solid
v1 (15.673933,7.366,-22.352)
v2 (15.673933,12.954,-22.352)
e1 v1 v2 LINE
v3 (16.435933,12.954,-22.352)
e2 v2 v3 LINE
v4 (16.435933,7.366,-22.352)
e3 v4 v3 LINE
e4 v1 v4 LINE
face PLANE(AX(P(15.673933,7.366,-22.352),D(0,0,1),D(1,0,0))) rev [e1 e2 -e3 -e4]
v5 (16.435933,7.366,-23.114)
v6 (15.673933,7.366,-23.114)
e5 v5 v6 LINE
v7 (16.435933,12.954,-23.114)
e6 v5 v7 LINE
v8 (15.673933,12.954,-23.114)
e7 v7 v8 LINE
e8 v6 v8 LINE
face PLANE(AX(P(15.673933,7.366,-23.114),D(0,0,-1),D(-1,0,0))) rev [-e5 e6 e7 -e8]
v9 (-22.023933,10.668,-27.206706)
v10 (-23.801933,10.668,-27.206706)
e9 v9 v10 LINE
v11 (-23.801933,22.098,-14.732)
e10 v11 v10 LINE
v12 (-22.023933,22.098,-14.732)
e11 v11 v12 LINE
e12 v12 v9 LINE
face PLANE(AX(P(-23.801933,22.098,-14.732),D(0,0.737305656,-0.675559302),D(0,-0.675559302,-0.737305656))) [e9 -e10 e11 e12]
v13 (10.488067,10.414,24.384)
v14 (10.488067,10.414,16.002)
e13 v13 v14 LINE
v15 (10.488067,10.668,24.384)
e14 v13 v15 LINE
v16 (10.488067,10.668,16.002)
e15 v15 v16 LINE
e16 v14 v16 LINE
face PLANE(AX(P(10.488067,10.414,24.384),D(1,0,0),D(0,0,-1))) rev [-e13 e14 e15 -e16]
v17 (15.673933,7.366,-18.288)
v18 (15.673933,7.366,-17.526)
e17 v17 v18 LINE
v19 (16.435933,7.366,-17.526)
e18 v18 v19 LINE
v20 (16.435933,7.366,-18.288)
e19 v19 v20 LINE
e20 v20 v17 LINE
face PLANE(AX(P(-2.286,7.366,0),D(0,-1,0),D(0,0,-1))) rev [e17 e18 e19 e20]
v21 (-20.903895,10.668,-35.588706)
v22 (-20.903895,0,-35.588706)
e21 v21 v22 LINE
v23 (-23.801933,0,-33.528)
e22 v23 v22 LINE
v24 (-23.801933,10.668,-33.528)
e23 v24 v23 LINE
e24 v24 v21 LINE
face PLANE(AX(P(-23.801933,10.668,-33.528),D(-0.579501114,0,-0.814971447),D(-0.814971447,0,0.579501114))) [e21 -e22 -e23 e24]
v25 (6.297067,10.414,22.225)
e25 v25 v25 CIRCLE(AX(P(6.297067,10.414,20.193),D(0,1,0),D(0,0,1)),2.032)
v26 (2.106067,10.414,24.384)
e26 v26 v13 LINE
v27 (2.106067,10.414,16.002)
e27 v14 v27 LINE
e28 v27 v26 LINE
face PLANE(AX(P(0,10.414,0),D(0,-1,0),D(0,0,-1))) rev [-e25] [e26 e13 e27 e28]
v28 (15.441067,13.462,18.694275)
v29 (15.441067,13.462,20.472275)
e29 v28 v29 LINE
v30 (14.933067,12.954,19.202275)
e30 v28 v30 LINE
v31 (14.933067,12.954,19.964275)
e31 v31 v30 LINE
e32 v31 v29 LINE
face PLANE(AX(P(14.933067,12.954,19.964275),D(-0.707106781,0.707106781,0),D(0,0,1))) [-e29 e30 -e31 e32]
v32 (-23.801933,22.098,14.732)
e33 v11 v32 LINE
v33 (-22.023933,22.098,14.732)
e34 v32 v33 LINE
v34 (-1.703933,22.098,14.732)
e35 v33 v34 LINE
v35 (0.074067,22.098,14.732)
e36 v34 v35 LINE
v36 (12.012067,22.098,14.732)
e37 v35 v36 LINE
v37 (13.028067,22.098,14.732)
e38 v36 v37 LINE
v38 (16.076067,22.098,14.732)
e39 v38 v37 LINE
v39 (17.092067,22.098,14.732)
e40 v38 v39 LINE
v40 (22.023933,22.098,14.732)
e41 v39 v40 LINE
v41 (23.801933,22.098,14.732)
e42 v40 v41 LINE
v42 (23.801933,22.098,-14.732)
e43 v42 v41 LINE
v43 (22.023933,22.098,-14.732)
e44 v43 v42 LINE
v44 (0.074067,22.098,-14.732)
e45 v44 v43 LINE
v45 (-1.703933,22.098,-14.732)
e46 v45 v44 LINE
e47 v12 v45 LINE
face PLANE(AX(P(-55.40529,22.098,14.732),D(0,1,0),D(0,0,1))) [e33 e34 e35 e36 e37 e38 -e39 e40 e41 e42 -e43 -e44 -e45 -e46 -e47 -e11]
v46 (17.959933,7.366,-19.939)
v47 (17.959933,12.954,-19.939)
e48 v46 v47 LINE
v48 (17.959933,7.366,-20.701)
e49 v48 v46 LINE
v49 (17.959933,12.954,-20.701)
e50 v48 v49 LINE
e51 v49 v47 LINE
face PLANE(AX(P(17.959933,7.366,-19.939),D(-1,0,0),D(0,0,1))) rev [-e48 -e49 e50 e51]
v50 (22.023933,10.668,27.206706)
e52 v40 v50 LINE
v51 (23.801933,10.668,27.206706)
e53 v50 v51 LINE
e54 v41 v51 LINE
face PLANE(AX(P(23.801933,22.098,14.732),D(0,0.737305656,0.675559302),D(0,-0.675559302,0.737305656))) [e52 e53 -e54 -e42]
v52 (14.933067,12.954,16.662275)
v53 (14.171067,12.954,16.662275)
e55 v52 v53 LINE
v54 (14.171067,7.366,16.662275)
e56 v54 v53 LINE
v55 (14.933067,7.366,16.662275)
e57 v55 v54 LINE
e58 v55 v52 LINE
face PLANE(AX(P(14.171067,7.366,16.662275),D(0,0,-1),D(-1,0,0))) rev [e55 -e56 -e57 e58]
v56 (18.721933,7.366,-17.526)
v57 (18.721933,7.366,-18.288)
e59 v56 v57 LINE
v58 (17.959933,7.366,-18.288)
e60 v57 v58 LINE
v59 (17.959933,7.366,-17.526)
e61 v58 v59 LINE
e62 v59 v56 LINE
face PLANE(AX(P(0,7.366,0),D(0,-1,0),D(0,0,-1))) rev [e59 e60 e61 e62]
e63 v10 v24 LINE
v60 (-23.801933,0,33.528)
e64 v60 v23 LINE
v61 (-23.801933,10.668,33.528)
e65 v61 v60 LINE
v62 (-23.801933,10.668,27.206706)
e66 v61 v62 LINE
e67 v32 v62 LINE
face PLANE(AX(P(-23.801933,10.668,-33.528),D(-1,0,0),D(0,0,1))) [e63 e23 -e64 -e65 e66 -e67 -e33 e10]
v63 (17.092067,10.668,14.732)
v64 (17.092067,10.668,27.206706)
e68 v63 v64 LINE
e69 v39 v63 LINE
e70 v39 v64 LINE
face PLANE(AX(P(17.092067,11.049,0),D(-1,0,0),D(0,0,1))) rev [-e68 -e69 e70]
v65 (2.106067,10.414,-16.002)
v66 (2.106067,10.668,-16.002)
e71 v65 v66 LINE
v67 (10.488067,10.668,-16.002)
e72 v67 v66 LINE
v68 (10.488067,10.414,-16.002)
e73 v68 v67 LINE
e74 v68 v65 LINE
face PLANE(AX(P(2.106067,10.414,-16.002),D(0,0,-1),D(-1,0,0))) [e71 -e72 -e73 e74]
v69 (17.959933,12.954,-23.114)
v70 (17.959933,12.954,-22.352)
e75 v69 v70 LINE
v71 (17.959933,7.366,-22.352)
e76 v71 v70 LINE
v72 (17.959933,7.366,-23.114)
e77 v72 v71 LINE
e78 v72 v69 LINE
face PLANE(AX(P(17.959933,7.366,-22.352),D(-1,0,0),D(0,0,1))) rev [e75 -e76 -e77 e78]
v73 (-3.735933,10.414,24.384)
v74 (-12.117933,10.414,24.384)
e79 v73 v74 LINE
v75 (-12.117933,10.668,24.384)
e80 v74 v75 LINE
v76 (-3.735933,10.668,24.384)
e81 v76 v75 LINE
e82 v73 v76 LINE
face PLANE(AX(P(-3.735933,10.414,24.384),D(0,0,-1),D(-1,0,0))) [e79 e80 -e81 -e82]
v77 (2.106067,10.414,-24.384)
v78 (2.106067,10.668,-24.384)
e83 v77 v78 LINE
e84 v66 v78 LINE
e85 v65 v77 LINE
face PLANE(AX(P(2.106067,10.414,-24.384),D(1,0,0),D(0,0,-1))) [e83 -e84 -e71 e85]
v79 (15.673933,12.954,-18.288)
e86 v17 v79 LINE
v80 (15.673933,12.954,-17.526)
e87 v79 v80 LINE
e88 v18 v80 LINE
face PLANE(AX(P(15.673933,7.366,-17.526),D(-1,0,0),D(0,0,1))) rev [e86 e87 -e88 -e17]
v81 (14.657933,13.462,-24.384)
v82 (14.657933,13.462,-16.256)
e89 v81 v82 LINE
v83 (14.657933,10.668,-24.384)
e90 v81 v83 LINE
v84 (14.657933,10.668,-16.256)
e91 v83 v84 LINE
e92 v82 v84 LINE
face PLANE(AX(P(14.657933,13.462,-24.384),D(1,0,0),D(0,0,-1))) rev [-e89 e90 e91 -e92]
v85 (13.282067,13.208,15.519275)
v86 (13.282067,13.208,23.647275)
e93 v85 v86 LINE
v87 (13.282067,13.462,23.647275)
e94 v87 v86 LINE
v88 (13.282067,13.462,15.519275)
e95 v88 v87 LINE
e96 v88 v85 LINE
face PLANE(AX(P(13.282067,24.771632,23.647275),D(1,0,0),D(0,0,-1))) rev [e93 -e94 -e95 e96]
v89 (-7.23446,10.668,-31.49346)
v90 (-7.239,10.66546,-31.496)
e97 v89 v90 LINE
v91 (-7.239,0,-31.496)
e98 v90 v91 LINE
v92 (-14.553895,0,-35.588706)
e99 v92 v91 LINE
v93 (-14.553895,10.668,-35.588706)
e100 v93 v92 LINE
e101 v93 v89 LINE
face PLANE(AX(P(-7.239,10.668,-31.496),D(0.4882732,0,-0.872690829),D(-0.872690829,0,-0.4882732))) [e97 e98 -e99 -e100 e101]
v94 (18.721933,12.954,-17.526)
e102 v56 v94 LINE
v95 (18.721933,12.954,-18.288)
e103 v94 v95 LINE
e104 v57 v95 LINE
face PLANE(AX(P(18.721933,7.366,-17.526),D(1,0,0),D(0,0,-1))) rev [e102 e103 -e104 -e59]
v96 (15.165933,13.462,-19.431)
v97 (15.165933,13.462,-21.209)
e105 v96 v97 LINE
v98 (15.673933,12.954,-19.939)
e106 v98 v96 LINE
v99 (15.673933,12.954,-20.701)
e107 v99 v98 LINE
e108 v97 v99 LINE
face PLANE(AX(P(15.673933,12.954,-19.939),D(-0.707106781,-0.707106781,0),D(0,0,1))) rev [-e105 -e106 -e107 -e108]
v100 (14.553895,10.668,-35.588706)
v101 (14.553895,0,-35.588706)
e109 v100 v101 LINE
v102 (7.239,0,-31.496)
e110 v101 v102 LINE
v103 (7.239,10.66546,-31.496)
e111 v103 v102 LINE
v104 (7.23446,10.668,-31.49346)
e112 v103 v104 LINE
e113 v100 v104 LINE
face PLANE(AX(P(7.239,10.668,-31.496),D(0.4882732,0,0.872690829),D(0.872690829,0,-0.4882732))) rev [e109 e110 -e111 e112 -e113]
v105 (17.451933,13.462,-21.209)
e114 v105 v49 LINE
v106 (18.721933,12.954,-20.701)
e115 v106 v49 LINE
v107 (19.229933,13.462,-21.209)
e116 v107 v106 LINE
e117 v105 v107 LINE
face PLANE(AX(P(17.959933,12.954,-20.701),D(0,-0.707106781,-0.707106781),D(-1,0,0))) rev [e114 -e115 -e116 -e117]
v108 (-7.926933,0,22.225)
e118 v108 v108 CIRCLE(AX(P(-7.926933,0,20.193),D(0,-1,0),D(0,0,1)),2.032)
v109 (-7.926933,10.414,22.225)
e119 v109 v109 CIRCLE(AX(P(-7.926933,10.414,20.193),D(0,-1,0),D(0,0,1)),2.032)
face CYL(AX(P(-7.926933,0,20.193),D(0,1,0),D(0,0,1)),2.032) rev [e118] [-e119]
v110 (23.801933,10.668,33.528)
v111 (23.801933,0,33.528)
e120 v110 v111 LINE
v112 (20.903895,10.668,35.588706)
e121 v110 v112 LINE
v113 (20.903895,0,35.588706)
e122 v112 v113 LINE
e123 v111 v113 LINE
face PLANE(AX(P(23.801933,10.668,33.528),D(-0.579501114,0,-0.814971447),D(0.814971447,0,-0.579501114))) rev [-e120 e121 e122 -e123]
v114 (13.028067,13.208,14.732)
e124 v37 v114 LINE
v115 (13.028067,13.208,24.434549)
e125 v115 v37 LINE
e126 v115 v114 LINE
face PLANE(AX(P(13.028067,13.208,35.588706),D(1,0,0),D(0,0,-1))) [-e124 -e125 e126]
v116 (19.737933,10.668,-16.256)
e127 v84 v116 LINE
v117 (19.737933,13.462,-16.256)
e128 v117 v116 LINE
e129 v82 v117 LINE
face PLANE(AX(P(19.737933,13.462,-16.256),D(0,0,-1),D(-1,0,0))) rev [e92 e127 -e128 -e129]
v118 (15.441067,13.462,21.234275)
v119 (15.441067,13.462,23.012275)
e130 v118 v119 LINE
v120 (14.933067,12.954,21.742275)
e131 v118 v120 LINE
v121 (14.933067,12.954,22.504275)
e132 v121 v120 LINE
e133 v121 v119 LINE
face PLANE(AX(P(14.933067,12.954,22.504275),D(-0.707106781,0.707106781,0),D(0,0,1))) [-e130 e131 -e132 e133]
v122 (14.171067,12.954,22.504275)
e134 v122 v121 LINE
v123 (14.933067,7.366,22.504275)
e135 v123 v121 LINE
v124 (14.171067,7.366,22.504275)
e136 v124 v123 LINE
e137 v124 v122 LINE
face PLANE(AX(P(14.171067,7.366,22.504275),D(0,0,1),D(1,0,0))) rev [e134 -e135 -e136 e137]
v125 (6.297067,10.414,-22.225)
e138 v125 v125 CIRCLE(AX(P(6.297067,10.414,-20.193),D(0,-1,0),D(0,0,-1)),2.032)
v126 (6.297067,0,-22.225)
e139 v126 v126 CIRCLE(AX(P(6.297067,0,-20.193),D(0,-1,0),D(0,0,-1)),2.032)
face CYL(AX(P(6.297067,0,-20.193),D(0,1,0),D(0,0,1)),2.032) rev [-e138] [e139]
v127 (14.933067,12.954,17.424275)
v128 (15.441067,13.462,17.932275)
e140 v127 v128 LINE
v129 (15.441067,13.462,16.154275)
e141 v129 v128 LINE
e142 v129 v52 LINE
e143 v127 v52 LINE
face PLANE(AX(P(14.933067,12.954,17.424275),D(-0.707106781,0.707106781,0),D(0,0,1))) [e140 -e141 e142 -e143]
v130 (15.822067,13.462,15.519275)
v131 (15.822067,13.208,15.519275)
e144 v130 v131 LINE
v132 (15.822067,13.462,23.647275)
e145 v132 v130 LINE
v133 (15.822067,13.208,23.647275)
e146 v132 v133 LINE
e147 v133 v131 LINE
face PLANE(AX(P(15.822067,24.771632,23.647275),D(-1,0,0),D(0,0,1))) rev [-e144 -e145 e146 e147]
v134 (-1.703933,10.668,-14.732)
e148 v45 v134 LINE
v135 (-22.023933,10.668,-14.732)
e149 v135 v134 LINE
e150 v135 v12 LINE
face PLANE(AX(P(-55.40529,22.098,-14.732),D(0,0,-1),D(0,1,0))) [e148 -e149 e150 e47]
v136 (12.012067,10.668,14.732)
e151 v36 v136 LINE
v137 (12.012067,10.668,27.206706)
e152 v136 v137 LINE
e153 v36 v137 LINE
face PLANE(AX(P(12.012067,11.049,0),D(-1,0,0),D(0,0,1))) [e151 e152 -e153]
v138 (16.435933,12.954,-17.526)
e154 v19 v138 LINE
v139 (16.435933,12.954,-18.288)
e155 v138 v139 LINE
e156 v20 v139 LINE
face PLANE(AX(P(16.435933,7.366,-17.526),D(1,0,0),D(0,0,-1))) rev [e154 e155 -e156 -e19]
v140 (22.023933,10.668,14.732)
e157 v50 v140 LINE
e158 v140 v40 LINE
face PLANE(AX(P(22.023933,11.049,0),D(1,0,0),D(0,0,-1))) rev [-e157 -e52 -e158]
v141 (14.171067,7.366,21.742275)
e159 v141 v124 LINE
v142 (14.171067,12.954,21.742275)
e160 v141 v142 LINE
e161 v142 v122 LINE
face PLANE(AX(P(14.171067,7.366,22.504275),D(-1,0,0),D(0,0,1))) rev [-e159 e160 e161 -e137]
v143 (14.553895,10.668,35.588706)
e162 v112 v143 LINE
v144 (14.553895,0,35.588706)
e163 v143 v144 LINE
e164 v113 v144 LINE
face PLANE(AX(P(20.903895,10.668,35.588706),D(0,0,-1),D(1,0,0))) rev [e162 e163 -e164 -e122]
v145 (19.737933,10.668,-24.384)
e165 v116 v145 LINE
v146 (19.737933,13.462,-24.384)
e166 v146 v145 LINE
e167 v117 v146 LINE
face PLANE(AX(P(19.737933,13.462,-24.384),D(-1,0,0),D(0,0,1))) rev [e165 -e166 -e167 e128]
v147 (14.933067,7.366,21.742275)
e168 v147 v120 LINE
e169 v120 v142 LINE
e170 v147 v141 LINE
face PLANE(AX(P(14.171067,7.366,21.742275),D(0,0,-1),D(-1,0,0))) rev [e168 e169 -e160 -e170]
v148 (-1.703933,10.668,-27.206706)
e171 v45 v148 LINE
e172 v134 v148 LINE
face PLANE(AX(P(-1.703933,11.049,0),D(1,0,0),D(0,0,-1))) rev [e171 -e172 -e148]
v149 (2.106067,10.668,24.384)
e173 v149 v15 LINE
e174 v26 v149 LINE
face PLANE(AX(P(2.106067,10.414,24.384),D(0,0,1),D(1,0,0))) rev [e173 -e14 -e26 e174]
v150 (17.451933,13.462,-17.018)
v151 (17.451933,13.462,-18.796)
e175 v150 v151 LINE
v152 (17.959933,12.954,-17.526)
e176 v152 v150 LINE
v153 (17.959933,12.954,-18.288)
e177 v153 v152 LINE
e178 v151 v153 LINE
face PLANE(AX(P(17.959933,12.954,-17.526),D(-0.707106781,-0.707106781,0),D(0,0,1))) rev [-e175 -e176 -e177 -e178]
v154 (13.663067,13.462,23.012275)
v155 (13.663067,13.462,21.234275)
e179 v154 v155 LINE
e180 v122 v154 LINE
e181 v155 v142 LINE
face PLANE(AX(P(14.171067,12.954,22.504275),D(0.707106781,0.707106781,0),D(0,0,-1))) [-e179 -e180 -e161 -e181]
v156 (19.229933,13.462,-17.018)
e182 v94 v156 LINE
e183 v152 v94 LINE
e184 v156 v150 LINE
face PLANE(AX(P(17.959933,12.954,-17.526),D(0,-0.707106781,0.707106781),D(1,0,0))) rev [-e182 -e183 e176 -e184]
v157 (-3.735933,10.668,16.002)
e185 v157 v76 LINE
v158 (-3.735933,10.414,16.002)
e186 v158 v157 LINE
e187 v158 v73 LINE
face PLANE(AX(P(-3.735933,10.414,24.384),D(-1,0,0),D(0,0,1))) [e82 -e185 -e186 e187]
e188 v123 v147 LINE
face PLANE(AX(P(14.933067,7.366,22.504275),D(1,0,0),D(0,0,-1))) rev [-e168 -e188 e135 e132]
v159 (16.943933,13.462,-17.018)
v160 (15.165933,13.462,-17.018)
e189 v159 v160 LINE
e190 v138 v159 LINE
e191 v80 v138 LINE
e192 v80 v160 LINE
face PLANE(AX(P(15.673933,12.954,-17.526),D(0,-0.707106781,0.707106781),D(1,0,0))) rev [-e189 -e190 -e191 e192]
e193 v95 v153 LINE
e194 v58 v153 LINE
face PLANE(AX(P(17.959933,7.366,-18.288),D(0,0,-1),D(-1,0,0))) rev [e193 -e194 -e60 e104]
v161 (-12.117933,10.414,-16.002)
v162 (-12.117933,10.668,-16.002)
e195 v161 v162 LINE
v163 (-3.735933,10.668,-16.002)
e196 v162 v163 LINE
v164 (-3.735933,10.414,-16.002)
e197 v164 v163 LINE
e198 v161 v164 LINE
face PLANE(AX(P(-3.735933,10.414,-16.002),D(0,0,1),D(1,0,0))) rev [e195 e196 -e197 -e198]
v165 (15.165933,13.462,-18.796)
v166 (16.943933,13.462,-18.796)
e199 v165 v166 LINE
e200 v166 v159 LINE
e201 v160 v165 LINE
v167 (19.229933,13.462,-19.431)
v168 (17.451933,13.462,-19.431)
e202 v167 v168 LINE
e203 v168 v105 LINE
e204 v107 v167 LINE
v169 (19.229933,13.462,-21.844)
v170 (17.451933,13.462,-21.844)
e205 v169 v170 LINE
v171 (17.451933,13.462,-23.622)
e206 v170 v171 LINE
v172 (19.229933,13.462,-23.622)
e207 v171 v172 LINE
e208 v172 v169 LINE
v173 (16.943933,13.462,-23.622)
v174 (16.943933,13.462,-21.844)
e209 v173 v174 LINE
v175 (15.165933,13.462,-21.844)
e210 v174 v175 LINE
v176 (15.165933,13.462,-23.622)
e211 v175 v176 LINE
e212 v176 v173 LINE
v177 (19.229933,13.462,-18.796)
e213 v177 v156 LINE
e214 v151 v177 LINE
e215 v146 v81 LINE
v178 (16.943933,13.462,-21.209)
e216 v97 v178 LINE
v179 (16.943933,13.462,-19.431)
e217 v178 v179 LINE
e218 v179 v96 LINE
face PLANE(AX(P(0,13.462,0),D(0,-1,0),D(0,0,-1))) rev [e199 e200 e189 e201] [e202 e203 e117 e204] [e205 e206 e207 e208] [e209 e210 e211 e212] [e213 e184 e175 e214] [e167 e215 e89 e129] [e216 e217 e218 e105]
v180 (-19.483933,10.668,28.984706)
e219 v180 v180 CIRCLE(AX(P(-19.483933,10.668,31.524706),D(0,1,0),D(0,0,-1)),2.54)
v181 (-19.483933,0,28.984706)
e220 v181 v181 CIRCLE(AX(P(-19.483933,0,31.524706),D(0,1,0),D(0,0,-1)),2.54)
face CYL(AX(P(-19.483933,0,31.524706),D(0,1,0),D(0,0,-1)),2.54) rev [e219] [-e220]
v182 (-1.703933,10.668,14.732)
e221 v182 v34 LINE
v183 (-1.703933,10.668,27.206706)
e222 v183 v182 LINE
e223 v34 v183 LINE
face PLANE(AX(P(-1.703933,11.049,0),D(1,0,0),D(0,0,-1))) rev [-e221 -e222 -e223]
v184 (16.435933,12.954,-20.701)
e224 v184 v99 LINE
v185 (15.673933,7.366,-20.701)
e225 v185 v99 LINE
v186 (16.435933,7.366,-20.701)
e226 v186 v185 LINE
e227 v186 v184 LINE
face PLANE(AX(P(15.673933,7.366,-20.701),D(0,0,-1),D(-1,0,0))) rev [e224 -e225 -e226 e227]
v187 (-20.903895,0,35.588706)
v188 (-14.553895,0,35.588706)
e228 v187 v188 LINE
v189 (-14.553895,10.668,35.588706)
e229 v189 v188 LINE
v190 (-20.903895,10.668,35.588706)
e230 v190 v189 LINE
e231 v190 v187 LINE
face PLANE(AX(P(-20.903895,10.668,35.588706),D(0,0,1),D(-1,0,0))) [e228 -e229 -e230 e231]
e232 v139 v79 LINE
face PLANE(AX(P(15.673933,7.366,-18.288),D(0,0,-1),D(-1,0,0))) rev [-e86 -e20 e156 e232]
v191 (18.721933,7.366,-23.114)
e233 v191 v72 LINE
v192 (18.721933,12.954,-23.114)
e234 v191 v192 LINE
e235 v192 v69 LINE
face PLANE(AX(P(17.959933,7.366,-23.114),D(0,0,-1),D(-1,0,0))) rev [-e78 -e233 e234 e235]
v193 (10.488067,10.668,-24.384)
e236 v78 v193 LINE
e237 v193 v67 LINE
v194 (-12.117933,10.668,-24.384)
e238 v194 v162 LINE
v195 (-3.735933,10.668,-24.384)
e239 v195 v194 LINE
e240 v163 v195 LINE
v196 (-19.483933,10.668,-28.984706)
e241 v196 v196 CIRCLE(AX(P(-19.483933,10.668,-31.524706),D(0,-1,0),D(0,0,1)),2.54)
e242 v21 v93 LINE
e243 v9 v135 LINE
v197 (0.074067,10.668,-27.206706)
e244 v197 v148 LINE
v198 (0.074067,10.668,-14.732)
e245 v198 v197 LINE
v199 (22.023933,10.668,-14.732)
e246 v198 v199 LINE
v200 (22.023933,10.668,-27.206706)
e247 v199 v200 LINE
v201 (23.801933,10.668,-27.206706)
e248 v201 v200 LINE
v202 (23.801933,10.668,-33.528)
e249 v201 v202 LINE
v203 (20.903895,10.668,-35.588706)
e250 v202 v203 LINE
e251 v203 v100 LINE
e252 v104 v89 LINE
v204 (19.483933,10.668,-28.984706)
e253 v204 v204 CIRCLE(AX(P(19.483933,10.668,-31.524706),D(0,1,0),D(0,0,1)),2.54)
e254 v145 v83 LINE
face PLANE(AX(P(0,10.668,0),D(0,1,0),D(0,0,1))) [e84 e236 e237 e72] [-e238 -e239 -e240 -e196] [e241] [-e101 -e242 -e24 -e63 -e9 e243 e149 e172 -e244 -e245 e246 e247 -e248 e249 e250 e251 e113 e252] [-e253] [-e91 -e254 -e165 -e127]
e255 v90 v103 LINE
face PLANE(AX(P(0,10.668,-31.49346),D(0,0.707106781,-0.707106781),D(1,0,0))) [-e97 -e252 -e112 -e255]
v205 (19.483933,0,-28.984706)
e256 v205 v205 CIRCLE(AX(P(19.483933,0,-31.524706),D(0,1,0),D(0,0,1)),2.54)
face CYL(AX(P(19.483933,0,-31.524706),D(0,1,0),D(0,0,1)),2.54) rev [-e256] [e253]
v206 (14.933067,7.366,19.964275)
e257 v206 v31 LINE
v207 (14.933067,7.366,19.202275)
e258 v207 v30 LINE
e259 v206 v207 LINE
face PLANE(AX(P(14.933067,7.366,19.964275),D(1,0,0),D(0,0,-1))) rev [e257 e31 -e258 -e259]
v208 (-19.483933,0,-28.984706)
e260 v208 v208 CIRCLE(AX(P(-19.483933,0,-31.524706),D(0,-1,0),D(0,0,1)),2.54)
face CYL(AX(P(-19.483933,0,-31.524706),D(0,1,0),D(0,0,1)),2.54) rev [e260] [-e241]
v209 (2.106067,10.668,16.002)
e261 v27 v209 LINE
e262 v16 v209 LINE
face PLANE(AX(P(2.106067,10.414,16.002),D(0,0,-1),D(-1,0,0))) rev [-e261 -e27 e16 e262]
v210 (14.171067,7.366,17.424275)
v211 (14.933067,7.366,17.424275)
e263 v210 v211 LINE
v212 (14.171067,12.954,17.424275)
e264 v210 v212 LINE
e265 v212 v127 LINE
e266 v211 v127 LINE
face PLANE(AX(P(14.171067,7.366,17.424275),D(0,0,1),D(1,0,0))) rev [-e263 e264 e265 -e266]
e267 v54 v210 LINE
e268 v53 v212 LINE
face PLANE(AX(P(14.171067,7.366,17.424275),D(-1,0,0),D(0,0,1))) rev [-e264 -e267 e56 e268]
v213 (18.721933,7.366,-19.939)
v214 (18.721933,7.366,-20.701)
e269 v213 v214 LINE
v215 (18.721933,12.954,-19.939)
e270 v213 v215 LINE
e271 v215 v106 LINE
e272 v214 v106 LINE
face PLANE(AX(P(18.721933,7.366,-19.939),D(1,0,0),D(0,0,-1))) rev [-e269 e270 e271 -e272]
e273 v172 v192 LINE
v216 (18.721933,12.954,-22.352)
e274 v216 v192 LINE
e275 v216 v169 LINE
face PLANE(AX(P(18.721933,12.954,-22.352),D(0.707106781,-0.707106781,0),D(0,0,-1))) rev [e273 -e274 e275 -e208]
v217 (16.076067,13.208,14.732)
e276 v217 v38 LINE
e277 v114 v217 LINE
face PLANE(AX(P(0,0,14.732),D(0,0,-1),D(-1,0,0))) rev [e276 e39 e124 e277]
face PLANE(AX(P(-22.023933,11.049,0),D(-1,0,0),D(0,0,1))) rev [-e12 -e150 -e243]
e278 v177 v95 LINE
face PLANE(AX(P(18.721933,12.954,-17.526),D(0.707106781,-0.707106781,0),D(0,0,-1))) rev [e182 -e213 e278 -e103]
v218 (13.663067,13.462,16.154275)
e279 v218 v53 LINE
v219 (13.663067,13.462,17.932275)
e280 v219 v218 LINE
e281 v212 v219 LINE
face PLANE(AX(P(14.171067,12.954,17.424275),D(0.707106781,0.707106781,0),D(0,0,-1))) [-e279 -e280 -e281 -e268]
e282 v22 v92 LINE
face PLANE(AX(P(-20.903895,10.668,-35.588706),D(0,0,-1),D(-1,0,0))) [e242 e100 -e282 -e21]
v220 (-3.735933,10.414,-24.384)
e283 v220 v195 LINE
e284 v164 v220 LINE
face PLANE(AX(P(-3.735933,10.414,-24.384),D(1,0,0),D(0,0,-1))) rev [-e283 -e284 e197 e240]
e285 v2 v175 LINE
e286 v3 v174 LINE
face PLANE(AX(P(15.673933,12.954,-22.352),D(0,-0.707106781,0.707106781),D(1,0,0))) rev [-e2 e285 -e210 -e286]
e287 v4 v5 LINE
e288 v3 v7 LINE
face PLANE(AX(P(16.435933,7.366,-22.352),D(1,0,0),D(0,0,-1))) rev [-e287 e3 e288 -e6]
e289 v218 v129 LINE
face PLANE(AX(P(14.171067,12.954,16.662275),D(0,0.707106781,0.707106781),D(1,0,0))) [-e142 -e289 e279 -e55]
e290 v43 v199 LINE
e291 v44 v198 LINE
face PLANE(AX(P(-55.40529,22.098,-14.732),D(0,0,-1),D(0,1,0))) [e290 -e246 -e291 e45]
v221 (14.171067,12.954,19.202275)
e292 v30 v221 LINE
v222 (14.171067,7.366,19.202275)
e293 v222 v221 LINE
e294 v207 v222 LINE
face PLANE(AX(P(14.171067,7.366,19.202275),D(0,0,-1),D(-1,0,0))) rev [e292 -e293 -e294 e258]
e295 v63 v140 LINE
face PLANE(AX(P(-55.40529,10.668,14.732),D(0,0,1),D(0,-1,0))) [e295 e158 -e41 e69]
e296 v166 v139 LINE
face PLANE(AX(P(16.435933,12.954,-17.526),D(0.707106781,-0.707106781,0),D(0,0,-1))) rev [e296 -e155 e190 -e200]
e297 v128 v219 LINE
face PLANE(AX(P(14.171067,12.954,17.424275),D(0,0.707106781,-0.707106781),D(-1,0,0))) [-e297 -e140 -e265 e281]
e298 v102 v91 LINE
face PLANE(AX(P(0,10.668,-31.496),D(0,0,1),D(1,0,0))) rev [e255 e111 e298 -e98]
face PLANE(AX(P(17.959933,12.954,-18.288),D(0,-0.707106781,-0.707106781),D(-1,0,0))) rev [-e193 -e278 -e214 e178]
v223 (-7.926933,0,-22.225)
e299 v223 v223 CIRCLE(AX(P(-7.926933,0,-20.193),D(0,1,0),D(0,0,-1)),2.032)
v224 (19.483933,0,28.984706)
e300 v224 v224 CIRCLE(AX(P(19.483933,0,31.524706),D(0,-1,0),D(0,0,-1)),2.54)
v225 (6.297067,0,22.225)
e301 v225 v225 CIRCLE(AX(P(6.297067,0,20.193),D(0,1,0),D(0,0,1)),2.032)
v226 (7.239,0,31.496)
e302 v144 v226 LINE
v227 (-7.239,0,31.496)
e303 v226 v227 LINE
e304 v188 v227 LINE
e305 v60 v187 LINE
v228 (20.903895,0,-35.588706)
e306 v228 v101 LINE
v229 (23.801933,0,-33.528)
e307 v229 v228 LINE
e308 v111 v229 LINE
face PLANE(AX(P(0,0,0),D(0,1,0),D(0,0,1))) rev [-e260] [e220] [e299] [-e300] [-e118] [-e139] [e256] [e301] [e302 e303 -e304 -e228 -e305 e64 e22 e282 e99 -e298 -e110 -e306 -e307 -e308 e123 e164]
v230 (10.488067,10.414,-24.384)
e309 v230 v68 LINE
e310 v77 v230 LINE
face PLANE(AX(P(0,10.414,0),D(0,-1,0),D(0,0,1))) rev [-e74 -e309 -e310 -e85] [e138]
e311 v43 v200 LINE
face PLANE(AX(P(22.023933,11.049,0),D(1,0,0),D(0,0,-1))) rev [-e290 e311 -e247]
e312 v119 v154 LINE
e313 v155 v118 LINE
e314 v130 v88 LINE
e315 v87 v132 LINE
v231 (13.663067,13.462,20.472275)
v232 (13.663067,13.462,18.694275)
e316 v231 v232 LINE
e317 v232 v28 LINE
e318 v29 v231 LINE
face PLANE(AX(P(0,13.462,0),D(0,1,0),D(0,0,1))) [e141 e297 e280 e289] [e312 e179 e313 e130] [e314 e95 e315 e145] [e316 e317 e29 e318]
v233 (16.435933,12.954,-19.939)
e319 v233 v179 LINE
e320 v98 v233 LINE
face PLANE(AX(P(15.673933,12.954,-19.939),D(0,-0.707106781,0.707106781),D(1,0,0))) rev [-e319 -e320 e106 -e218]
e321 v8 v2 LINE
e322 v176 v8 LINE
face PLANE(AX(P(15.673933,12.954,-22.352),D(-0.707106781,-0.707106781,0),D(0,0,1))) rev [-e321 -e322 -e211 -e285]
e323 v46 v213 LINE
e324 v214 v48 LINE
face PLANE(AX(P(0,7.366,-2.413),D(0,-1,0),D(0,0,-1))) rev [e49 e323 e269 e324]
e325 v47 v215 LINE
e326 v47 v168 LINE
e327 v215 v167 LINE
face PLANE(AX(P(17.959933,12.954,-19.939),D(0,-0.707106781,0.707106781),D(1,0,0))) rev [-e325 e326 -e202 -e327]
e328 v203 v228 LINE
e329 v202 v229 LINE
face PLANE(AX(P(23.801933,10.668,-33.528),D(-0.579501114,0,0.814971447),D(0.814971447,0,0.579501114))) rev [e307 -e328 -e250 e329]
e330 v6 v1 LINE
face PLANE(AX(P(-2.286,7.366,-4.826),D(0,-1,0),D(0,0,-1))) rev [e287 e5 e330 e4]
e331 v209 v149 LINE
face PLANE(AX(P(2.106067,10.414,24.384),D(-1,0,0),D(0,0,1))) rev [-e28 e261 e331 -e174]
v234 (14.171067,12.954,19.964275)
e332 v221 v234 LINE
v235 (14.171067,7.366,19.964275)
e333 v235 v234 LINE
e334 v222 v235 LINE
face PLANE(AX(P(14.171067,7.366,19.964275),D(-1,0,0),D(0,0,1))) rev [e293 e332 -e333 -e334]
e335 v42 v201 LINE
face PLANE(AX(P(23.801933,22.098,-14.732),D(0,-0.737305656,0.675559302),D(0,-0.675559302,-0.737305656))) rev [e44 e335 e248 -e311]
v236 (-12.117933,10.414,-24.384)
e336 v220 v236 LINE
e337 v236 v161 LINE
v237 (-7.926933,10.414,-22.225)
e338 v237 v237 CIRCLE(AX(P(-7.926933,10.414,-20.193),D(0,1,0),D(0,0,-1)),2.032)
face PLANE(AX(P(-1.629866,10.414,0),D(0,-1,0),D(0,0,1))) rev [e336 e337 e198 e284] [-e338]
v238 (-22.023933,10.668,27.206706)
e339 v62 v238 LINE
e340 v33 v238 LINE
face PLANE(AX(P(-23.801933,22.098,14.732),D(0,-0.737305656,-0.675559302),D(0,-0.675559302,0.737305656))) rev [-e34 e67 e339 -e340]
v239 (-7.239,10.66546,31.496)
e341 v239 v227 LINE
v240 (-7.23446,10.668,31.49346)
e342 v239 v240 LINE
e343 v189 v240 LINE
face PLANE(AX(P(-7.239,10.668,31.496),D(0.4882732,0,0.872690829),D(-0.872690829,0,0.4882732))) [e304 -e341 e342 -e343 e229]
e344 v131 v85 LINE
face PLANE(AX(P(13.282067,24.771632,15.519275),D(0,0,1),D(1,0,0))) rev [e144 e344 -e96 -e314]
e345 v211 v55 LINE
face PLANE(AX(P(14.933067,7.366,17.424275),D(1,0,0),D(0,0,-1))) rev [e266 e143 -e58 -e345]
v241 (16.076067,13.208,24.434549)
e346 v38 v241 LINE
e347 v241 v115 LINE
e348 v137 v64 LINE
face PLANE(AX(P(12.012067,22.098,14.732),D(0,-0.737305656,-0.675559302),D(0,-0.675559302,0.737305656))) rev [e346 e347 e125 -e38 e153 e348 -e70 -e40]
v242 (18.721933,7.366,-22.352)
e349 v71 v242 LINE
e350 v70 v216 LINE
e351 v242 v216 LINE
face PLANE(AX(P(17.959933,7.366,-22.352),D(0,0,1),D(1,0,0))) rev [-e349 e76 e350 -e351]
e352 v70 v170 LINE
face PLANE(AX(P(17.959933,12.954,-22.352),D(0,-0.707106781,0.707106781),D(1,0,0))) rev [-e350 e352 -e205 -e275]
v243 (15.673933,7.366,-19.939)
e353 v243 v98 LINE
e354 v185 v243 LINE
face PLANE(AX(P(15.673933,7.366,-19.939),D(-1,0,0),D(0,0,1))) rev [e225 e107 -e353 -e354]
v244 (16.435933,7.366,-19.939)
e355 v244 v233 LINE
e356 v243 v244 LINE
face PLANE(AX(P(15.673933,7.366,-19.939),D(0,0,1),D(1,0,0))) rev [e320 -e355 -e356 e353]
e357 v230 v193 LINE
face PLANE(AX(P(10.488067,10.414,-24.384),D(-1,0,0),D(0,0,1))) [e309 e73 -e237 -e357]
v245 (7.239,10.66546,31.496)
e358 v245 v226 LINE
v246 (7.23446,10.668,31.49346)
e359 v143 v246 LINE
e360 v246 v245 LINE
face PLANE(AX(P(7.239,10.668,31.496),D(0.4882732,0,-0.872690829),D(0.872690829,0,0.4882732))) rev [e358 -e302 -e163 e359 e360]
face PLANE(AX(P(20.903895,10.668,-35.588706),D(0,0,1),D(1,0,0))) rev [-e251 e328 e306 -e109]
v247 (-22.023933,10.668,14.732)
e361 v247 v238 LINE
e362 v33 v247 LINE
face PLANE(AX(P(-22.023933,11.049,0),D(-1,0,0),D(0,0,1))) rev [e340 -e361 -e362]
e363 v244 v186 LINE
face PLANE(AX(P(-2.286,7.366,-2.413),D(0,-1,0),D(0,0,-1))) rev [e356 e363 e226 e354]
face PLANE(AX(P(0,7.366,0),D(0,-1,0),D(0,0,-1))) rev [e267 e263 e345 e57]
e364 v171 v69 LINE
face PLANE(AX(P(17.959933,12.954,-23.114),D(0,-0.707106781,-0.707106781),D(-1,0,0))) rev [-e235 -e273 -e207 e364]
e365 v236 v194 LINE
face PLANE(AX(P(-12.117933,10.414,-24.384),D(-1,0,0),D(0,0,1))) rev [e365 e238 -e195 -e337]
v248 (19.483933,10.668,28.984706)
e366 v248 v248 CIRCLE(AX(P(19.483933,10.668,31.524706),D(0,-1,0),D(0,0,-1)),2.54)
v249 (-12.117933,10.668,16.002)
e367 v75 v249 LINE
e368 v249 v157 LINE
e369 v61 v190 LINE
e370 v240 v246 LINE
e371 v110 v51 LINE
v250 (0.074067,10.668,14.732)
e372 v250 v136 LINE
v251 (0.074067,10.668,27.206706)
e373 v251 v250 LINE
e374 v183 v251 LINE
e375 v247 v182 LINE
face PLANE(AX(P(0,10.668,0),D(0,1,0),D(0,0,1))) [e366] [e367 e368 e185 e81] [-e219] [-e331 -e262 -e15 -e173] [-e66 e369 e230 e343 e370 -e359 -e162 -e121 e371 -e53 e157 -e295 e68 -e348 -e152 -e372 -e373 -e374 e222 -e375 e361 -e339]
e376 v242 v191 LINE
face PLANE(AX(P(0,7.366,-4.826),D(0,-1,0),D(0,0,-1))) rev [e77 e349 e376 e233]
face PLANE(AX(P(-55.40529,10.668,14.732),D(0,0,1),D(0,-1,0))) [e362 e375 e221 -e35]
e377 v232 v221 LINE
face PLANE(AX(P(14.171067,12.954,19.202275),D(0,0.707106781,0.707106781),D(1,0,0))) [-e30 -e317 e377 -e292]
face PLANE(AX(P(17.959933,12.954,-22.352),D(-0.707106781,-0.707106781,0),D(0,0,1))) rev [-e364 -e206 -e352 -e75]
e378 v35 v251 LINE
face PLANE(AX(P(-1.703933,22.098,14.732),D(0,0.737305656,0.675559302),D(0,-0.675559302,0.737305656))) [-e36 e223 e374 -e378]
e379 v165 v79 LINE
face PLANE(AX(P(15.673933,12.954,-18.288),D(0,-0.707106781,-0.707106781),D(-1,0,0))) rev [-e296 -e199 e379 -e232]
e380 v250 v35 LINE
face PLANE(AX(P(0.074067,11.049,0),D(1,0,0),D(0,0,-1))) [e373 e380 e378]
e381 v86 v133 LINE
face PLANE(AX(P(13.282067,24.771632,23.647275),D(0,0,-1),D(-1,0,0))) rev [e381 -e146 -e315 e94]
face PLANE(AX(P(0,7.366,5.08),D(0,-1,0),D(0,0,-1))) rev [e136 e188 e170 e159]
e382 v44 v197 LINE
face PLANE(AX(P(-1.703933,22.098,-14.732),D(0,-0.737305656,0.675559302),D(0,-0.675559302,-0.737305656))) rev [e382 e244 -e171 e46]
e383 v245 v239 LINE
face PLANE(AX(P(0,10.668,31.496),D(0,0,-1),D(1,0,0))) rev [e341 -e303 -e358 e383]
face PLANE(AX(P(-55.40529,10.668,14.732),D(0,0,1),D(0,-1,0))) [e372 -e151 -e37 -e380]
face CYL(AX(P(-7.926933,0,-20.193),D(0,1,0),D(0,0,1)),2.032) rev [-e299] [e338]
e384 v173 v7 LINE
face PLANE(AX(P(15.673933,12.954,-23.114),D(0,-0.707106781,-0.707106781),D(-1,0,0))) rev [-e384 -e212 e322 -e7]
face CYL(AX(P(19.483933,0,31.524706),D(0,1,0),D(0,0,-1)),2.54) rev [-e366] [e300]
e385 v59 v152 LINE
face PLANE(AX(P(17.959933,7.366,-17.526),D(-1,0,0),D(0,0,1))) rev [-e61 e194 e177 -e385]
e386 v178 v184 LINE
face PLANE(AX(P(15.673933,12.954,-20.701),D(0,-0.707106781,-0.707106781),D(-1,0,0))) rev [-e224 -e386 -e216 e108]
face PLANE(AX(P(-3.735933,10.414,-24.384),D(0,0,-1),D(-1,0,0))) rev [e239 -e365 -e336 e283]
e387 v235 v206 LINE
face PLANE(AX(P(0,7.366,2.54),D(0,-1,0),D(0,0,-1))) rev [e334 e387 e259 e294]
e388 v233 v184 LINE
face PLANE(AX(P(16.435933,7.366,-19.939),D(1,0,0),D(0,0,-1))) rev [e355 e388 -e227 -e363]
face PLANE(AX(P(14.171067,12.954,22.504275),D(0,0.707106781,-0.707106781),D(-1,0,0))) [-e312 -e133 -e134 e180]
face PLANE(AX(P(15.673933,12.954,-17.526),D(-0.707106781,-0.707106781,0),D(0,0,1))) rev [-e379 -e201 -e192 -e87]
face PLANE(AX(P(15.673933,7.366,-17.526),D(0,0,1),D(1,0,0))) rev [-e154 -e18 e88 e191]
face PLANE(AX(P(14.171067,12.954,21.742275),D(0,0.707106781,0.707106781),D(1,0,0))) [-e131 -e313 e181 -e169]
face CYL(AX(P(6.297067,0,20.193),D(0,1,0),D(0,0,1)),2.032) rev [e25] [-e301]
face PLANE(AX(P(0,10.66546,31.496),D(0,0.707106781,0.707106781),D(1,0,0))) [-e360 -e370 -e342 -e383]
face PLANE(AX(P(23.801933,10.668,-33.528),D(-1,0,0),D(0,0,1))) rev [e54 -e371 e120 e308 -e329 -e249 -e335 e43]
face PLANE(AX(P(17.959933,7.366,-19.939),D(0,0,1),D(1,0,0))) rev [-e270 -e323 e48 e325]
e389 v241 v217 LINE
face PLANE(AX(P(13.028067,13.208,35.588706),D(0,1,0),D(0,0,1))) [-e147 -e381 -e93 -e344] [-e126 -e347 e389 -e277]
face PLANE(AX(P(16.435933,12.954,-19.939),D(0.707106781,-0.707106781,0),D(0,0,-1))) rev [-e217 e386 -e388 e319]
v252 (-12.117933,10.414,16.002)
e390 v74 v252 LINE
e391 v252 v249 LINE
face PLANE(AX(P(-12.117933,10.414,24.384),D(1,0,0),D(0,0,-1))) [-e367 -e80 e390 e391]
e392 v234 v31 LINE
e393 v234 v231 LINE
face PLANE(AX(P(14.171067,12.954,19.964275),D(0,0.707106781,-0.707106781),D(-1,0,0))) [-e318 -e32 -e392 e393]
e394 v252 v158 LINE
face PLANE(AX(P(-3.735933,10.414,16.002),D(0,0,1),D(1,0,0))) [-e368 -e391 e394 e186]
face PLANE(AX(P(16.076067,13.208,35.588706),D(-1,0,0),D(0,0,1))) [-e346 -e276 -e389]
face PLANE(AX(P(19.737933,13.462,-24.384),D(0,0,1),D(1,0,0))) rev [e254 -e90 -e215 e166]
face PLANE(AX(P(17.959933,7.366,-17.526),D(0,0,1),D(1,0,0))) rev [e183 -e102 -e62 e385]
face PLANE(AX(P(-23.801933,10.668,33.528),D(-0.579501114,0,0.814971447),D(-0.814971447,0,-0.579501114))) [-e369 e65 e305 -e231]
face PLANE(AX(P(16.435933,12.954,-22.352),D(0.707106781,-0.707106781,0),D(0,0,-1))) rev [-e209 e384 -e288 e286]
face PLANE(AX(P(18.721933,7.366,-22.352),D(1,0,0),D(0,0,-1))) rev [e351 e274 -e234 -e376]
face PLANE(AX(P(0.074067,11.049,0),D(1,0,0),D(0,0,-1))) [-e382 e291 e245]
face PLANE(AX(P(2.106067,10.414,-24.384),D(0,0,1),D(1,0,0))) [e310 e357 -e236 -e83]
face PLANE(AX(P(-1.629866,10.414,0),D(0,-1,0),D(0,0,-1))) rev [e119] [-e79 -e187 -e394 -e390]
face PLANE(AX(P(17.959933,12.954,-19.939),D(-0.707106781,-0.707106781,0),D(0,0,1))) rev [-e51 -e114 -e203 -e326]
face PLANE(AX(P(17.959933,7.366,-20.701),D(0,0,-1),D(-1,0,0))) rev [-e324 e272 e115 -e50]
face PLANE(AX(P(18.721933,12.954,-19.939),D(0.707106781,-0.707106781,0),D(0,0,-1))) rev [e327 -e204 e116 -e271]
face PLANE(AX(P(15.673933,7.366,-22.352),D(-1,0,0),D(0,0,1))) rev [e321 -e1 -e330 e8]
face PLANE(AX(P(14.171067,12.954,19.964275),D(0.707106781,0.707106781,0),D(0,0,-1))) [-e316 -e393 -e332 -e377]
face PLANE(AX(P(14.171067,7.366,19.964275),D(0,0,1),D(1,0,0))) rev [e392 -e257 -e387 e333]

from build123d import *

# Parameters (mm, degrees)
BOSS_EXTRUDE1_DEPTH        = 10.668
SKETCH3_R                  = 2.54
CUT_EXTRUDE1_DEPTH         = 45.123624398
CHAMFER1_SIZE              = 0.00254
SKETCH4_W                  = 29.464
SKETCH4_H                  = 11.43
BOSS_EXTRUDE2_DEPTH        = 47.603865979
RIB1_REACH                 = 51.045
SKETCH5_WALL_W             = 117.009615236
SKETCH5_WALL_H             = 1.778
RIB2_REACH                 = 65.411
SKETCH6_WALL_W             = 145.742114112
SKETCH6_WALL_H             = 1.778
RIB3_START                 = -1.778
RIB3_DEPTH                 = 1.778
RIB4_START                 = -5.08
RIB4_DEPTH                 = 5.08
SKETCH9_W                  = 3.048
SKETCH9_H                  = 8.89
CUT_EXTRUDE2_DEPTH         = 60.891794651
SKETCH13_W                 = 2.54
SKETCH13_H                 = 8.128
BOSS_EXTRUDE3_DEPTH        = 0.254
SKETCH14_W                 = 0.762
SKETCH14_H                 = 0.762
CUT_EXTRUDE4_DEPTH         = 6.096
CHAMFER2_SIZE              = 0.508
LPATTERN1_COUNT            = 3
LPATTERN1_PITCH            = 2.54
CHAMFER2_OF_LPATTERN1_SIZE = 0.508
SKETCH15_W                 = 5.08
SKETCH15_H                 = 8.128
BOSS_EXTRUDE4_DEPTH        = 2.794
SKETCH16_W                 = 0.762
SKETCH16_H                 = 0.762
CUT_EXTRUDE5_DEPTH         = 6.096
CHAMFER3_SIZE              = 0.508
LPATTERN2_COUNT            = 3
LPATTERN2_PITCH            = 2.413
LPATTERN2_COUNT_DIR2       = 2
LPATTERN2_PITCH_DIR2       = 2.286
CHAMFER3_OF_LPATTERN2_SIZE = 0.508
SKETCH18_W                 = 8.382
SKETCH18_H                 = 8.382
CUT_EXTRUDE6_DEPTH         = 0.254
SKETCH19_R                 = 2.032
CUT_EXTRUDE7_DEPTH         = 45.380219265
MIRROR5_COPY_1_SKETCH_W    = 8.382
MIRROR5_COPY_1_SKETCH_H    = 8.382
MIRROR5_COPY_1_DEPTH       = 0.254
MIRROR5_COPY_2_SKETCH_R    = 2.032
MIRROR5_COPY_2_DEPTH       = 45.380219265


# Read off the part's stored shape, not the designer's step: Rib3, Rib4
with BuildPart() as part:
    # Sketch1 → Boss-Extrude1 (new body)
    with BuildSketch(Plane(origin=(0, 0, 0), x_dir=(1, 0, 0), z_dir=(0, 1, 0))):
        Polygon((0, 31.496), (7.239, 31.496), (14.553894525, 35.588705961), (20.903894525, 35.588705961), (23.801932989, 33.528), (23.801932989, 0), (0, 0), align=None)
    boss_extrude1 = extrude(amount=BOSS_EXTRUDE1_DEPTH)

    # Sketch3 → Cut-Extrude1 (cut, through all)
    with BuildSketch(Plane(origin=(0, 10.668, 0), x_dir=(1, 0, 0), z_dir=(0, 1, 0))):
        with Locations(Location((19.483932989, 31.524705961, 0), (0, 0, 270))):
            Circle(SKETCH3_R)
    cut_extrude1 = extrude(amount=-CUT_EXTRUDE1_DEPTH, mode=Mode.SUBTRACT)

    # Mirror1: Boss-Extrude1, Cut-Extrude1 across plane
    add(boss_extrude1.mirror(Plane(origin=(0, 0, 0), x_dir=(0, 0, 1), z_dir=(1, 0, 0))))
    add(cut_extrude1.mirror(Plane(origin=(0, 0, 0), x_dir=(0, 0, 1), z_dir=(1, 0, 0))), mode=Mode.SUBTRACT)

    # Mirror2: part across plane


with BuildPart() as part_1:
    add(part.part)
    add(part.part.mirror(Plane.XY))

    # Chamfer1
    chamfer1_edges = [part_1.edges().sort_by_distance(p)[0] for p in [
        (0, 10.668, -31.496),
        (0, 10.668, 31.496),
    ]]
    chamfer(chamfer1_edges, length=CHAMFER1_SIZE)

    # Sketch4 → Boss-Extrude2 (add)
    with BuildSketch(Plane(origin=(23.801932989, 0, 0), x_dir=(0, 0, -1), z_dir=(1, 0, 0))):
        with Locations((0, 16.383)):
            Rectangle(SKETCH4_W, SKETCH4_H)
    extrude(amount=-BOSS_EXTRUDE2_DEPTH)

    # Sketch5 wall → Rib1 (add, up to next)
    with BuildSketch(Plane(origin=(-1.703932989, 16.383, 20.96935298), x_dir=(0, -0.675559301544, 0.737305655816), z_dir=(0, -0.737305655816, -0.675559301544)), mode=Mode.PRIVATE) as rib1_sk1:
        with Locations((0, -0.889)):
            Rectangle(SKETCH5_WALL_W, SKETCH5_WALL_H)
    rib1_tool1 = extrude(rib1_sk1.sketch, amount=RIB1_REACH, mode=Mode.PRIVATE) - part_1.part
    rib1 = rib1_tool1.solids().sort_by_distance((-1.703932989, 16.383, 20.96935298))[0]
    add(rib1)

    # Sketch6 wall → Rib2 (add, up to next)
    with BuildSketch(Plane(origin=(23.801932989, 16.383, 20.96935298), x_dir=(0, -0.675559301544, 0.737305655816), z_dir=(0, -0.737305655816, -0.675559301544)), mode=Mode.PRIVATE) as rib2_sk1:
        with Locations((0, 0.889)):
            Rectangle(SKETCH6_WALL_W, SKETCH6_WALL_H)
    rib2_tool1 = extrude(rib2_sk1.sketch, amount=RIB2_REACH, mode=Mode.PRIVATE) - part_1.part
    rib2 = rib2_tool1.solids().sort_by_distance((23.801932989, 16.383, 20.96935298))[0]
    add(rib2)

    # Rib3 outline → Rib3 (add)
    with BuildSketch(Plane.ZY.offset(23.801932989).offset(RIB3_START)):
        Polygon((27.206705961, 10.668), (14.732, 22.098), (14.732, 10.668), align=None)
    rib3 = extrude(amount=RIB3_DEPTH)

    # Rib4 outline → Rib4 (add)
    with BuildSketch(Plane.ZY.offset(-12.012067011).offset(RIB4_START)):
        Polygon((27.206705961, 10.668), (14.732, 22.098), (14.732, 10.668), align=None)
    extrude(amount=RIB4_DEPTH)

    # Sketch9 → Cut-Extrude2 (cut, through all)
    with BuildSketch(Plane.XY.offset(14.732)):
        with Locations((14.552067011, 17.653)):
            Rectangle(SKETCH9_W, SKETCH9_H)
    extrude(amount=CUT_EXTRUDE2_DEPTH, mode=Mode.SUBTRACT)

    # Sketch13 → Boss-Extrude3 (add)
    with BuildSketch(Plane(origin=(0, 13.208, 0), x_dir=(1, 0, 0), z_dir=(0, 1, 0))):
        with Locations((14.552067011, -19.583274541)):
            Rectangle(SKETCH13_W, SKETCH13_H)
    extrude(amount=BOSS_EXTRUDE3_DEPTH)

    # Sketch14 → Cut-Extrude4 (cut)
    with BuildSketch(Plane(origin=(0, 13.462, 0), x_dir=(1, 0, 0), z_dir=(0, 1, 0))):
        with Locations((14.552067011, -17.043274541)):
            Rectangle(SKETCH14_W, SKETCH14_H)
    cut_extrude4 = extrude(amount=-CUT_EXTRUDE4_DEPTH, mode=Mode.SUBTRACT)

    # Chamfer2
    chamfer2_edges = [part_1.edges().sort_by_distance(p)[0] for p in [
        (14.933067011, 13.462, 17.043274541),
        (14.552067011, 13.462, 16.662274541),
        (14.171067011, 13.462, 17.043274541),
        (14.552067011, 13.462, 17.424274541),
    ]]
    chamfer(chamfer2_edges, length=CHAMFER2_SIZE)

    # LPattern1: Cut-Extrude4 ×3
    with Locations(*[(0, 0, i * LPATTERN1_PITCH) for i in range(1, LPATTERN1_COUNT)]):
        add(cut_extrude4, mode=Mode.SUBTRACT)

    # Chamfer2 of LPattern1
    chamfer2_of_lpattern1_edges = [part_1.edges().sort_by_distance(p)[0] for p in [
        (14.933067011, 13.462, 19.583274541),
        (14.552067011, 13.462, 19.202274541),
        (14.171067011, 13.462, 19.583274541),
        (14.552067011, 13.462, 19.964274541),
        (14.933067011, 13.462, 22.123274541),
        (14.552067011, 13.462, 21.742274541),
        (14.171067011, 13.462, 22.123274541),
        (14.552067011, 13.462, 22.504274541),
    ]]
    chamfer(chamfer2_of_lpattern1_edges, length=CHAMFER2_OF_LPATTERN1_SIZE)

    # Mirror3: Rib1, Rib2, Rib3 across plane
    add(rib1.mirror(Plane.XY))
    add(rib2.mirror(Plane.XY))
    add(rib3.mirror(Plane.XY))

    # Sketch15 → Boss-Extrude4 (add)
    with BuildSketch(Plane(origin=(0, 10.668, 0), x_dir=(1, 0, 0), z_dir=(0, 1, 0))):
        with Locations((17.197932989, 20.32)):
            Rectangle(SKETCH15_W, SKETCH15_H)
    extrude(amount=BOSS_EXTRUDE4_DEPTH)

    # Sketch16 → Cut-Extrude5 (cut)
    with BuildSketch(Plane(origin=(0, 13.462, 0), x_dir=(1, 0, 0), z_dir=(0, 1, 0))):
        with Locations((18.340932989, 17.907)):
            Rectangle(SKETCH16_W, SKETCH16_H)
    cut_extrude5 = extrude(amount=-CUT_EXTRUDE5_DEPTH, mode=Mode.SUBTRACT)

    # Chamfer3
    chamfer3_edges = [part_1.edges().sort_by_distance(p)[0] for p in [
        (18.721932989, 13.462, -17.907),
        (18.340932989, 13.462, -18.288),
        (17.959932989, 13.462, -17.907),
        (18.340932989, 13.462, -17.526),
    ]]
    chamfer(chamfer3_edges, length=CHAMFER3_SIZE)

    # LPattern2: Cut-Extrude5 3 × 2
    with Locations(*[(-j * LPATTERN2_PITCH_DIR2, 0, -i * LPATTERN2_PITCH) for i in range(LPATTERN2_COUNT) for j in range(LPATTERN2_COUNT_DIR2) if (i, j) != (0, 0)]):
        add(cut_extrude5, mode=Mode.SUBTRACT)

    # Chamfer3 of LPattern2
    chamfer3_of_lpattern2_edges = [part_1.edges().sort_by_distance(p)[0] for p in [
        (16.435932989, 13.462, -17.907),
        (16.054932989, 13.462, -18.288),
        (15.673932989, 13.462, -17.907),
        (16.054932989, 13.462, -17.526),
        (18.721932989, 13.462, -20.32),
        (18.340932989, 13.462, -20.701),
        (17.959932989, 13.462, -20.32),
        (18.340932989, 13.462, -19.939),
        (16.435932989, 13.462, -20.32),
        (16.054932989, 13.462, -20.701),
        (15.673932989, 13.462, -20.32),
        (16.054932989, 13.462, -19.939),
        (18.721932989, 13.462, -22.733),
        (18.340932989, 13.462, -23.114),
        (17.959932989, 13.462, -22.733),
        (18.340932989, 13.462, -22.352),
        (16.435932989, 13.462, -22.733),
        (16.054932989, 13.462, -23.114),
        (15.673932989, 13.462, -22.733),
        (16.054932989, 13.462, -22.352),
    ]]
    chamfer(chamfer3_of_lpattern2_edges, length=CHAMFER3_OF_LPATTERN2_SIZE)

    # Sketch18 → Cut-Extrude6 (cut)
    with BuildSketch(Plane(origin=(0, 10.668, 0), x_dir=(1, 0, 0), z_dir=(0, 1, 0))):
        with Locations((6.297067011, -20.193)):
            Rectangle(SKETCH18_W, SKETCH18_H)
    cut_extrude6 = extrude(amount=-CUT_EXTRUDE6_DEPTH, mode=Mode.SUBTRACT)

    # Sketch19 → Cut-Extrude7 (cut, through all)
    with BuildSketch(Plane(origin=(0, 10.414, 0), x_dir=(1, 0, 0), z_dir=(0, 1, 0))):
        with Locations(Location((6.297067011, -20.193, 0), (0, 0, 270))):
            Circle(SKETCH19_R)
    cut_extrude7 = extrude(amount=-CUT_EXTRUDE7_DEPTH, mode=Mode.SUBTRACT)

    # Mirror4: Cut-Extrude6, Cut-Extrude7 across plane
    add(cut_extrude6.mirror(Plane.ZY.offset(0.814932989)), mode=Mode.SUBTRACT)
    add(cut_extrude7.mirror(Plane.ZY.offset(0.814932989)), mode=Mode.SUBTRACT)

    # Mirror5: Cut-Extrude6, Cut-Extrude7 across plane
    add(cut_extrude6.mirror(Plane.XY), mode=Mode.SUBTRACT)
    add(cut_extrude7.mirror(Plane.XY), mode=Mode.SUBTRACT)

    # Mirror5 copy 1 sketch → Mirror5 copy 1 (cut)
    with BuildSketch(Plane(origin=(-1.629865979, 10.668, 0), x_dir=(-1, 0, 0), z_dir=(0, 1, 0))):
        with Locations((6.297067011, -20.193)):
            Rectangle(MIRROR5_COPY_1_SKETCH_W, MIRROR5_COPY_1_SKETCH_H)
    extrude(amount=-MIRROR5_COPY_1_DEPTH, mode=Mode.SUBTRACT)

    # Mirror5 copy 2 sketch → Mirror5 copy 2 (cut, through all)
    with BuildSketch(Plane(origin=(-1.629865979, 10.414, 0), x_dir=(-1, 0, 0), z_dir=(0, 1, 0))):
        with Locations(Location((6.297067011, -20.193, 0), (0, 0, 270))):
            Circle(MIRROR5_COPY_2_SKETCH_R)
    extrude(amount=-MIRROR5_COPY_2_DEPTH, mode=Mode.SUBTRACT)


solid = part_1.part
